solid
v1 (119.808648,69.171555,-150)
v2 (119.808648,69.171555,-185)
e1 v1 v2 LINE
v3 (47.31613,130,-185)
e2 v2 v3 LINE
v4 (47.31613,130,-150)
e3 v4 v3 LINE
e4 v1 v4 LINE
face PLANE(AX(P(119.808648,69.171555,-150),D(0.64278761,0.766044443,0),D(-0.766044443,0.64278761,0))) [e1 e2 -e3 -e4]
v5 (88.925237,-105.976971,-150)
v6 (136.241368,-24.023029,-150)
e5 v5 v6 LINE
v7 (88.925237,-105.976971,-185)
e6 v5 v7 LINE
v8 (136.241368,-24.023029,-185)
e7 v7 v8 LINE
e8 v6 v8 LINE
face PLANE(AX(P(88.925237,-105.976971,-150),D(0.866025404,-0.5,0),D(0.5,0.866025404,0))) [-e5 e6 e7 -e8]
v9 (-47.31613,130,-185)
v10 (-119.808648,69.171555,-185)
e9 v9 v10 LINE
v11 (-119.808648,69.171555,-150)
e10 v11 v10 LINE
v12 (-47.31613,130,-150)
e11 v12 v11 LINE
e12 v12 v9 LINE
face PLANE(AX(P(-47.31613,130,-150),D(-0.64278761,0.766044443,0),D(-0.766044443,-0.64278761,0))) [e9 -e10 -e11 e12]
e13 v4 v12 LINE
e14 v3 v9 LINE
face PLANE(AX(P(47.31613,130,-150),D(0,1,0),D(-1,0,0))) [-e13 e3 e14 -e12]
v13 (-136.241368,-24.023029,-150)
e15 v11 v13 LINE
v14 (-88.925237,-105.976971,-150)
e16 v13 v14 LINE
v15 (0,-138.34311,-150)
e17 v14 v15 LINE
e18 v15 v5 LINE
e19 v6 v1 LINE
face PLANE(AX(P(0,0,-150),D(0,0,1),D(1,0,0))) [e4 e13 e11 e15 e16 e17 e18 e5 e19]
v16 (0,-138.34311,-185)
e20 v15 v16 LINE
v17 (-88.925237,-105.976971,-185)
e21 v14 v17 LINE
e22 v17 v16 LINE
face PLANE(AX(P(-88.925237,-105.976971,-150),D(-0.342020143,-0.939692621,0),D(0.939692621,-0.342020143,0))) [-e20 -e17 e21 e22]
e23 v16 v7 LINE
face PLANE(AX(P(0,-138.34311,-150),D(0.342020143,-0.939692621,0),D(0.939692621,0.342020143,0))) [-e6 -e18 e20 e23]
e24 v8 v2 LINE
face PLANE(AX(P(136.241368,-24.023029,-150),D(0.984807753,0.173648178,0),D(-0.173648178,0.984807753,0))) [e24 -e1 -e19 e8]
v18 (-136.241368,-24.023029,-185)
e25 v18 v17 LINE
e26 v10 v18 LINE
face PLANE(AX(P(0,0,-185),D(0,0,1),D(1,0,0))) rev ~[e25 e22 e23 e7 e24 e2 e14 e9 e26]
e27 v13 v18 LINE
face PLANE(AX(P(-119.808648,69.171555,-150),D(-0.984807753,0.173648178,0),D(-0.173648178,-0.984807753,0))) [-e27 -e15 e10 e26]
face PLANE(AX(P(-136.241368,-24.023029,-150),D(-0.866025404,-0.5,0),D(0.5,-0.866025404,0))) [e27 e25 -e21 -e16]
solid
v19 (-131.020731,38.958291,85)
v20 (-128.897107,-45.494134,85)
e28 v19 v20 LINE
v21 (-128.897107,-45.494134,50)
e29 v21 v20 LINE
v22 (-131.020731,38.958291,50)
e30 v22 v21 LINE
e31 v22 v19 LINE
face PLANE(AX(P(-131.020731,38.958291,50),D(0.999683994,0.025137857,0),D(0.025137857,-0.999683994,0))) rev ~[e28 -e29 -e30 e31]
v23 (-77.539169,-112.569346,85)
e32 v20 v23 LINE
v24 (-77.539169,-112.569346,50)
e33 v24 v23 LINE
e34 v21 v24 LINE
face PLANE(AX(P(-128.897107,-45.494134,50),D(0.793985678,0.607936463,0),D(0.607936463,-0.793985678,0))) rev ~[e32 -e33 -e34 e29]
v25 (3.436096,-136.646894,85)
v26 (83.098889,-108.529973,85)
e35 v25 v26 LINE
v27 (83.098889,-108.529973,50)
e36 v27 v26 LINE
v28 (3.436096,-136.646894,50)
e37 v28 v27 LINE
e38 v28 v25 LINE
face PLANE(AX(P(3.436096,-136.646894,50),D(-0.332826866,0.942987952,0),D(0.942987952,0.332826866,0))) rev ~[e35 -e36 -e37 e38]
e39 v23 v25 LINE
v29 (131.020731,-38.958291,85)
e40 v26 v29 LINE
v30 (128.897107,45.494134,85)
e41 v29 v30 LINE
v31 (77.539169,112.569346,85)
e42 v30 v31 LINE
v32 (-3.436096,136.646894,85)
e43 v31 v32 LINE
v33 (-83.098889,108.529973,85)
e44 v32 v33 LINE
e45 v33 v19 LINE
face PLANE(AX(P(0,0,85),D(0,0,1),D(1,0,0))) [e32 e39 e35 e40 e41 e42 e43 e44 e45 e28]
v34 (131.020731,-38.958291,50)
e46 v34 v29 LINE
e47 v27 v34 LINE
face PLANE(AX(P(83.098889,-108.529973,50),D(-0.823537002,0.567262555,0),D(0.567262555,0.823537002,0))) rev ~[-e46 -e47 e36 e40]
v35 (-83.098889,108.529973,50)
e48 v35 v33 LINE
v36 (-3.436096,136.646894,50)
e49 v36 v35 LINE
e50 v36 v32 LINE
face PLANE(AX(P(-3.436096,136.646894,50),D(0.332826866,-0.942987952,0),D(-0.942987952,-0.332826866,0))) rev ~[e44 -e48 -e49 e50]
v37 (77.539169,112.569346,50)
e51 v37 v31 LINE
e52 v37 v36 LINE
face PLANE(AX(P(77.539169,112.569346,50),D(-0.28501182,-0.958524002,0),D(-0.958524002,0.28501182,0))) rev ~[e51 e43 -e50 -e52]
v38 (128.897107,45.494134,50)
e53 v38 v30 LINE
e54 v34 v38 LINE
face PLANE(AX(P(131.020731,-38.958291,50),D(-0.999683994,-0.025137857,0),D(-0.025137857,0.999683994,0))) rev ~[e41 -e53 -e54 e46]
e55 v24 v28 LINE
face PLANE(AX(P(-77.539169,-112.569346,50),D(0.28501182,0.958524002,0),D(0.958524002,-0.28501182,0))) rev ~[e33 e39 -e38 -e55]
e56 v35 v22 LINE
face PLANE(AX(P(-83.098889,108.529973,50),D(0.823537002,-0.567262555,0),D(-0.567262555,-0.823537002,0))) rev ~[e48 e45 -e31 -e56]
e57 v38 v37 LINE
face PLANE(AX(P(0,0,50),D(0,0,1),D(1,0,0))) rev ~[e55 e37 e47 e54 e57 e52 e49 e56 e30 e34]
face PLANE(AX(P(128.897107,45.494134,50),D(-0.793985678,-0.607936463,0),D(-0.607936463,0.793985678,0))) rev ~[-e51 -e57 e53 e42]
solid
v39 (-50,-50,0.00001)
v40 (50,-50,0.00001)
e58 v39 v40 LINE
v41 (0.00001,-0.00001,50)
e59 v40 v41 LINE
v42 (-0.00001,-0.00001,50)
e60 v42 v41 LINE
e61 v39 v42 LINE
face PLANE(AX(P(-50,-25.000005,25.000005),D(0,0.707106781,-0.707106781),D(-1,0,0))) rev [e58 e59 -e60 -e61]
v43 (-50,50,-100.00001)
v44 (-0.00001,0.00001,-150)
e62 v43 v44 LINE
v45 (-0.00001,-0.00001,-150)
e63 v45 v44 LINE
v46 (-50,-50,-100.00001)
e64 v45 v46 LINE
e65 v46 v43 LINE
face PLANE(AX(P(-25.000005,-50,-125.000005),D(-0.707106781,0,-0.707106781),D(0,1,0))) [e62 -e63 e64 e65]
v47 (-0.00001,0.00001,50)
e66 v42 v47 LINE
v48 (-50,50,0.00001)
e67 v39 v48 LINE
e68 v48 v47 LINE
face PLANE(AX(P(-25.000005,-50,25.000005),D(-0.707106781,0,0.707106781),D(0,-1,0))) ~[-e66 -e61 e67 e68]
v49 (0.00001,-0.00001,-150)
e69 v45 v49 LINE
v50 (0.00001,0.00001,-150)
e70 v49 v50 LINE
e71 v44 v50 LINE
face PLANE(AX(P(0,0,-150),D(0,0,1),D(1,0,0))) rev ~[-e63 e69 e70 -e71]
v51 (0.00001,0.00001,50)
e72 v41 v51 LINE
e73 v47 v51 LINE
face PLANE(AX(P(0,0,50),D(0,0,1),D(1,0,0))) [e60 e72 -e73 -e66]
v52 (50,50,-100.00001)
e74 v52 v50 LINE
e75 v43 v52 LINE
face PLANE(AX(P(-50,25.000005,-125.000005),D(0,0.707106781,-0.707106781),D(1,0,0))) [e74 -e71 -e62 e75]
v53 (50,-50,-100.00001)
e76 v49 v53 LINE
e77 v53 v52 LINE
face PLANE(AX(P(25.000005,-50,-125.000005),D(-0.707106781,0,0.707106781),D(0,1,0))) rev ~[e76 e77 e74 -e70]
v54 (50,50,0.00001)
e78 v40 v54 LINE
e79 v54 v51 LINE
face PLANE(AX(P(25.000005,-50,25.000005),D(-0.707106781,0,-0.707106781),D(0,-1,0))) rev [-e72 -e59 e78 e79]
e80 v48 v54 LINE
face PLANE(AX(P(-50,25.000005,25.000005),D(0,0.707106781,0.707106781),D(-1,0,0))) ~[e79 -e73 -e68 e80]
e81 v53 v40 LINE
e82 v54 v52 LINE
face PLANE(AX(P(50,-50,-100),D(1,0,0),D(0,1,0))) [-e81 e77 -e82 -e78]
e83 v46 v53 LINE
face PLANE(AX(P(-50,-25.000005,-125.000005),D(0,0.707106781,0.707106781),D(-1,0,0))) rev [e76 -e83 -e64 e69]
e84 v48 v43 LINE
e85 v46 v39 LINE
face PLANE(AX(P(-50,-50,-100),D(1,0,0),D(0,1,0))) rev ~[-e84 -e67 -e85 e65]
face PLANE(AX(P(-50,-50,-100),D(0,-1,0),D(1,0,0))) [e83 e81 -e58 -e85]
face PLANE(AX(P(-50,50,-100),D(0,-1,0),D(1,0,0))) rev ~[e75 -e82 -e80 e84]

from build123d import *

# Parameters (mm, degrees)
F0_W      = 100
F0_H      = 100
F1_DEPTH  = 100
F2_DEPTH  = 50
F3_SIZE   = 49.99999
F6_DEPTH  = 35
F7_DEPTH  = 50
F8_SIZE   = 49.99999
F11_DEPTH = 35


# Not quite as in the source:
# - a fillet or chamfer is up to 0.001 mm smaller than in the source, because OpenCascade refuses the exact size


with BuildPart() as f1:
    # F0 (on Top) → F1 (new body)
    with BuildSketch(Plane.XY):
        Rectangle(F0_W, F0_H)
    extrude(amount=-F1_DEPTH)

    # F2 (add): a face of the model
    f2_faces = [f1.faces().sort_by_distance(p)[0] for p in [
        (0, 0, 0),
    ]]
    extrude(f2_faces, amount=F2_DEPTH)

    # F3 (size 50 in the source; OpenCascade refuses exactly that, so slightly less here)
    f3_edges = [f1.edges().sort_by_distance(p)[0] for p in [
        (0, -50, 50),
        (0, 50, 50),
        (50, 0, 50),
        (-50, 0, 50),
    ]]
    chamfer(f3_edges, length=F3_SIZE)

    # F7 (add): a face of the model
    f7_faces = [f1.faces().sort_by_distance(p)[0] for p in [
        (0, 0, -100),
    ]]
    extrude(f7_faces, amount=F7_DEPTH)

    # F8 (size 50 in the source; OpenCascade refuses exactly that, so slightly less here)
    f8_edges = [f1.edges().sort_by_distance(p)[0] for p in [
        (0, -50, -150),
        (50, 0, -150),
        (-50, 0, -150),
        (0, 50, -150),
    ]]
    chamfer(f8_edges, length=F8_SIZE)


with BuildPart() as f6:
    # F5 (on offset) → F6 (new body)
    with BuildSketch(Plane.XY.offset(50)):
        Polygon((83.0988892729, -108.5299731581), (131.0207312895, -38.9582910875), (128.8971071844, 45.494134035), (77.5391691864, 112.5693462448), (-3.4360959814, 136.6468942805), (-83.0988892729, 108.5299731581), (-131.0207312895, 38.9582910875), (-128.8971071844, -45.494134035), (-77.5391691864, -112.5693462448), (3.4360959814, -136.6468942805), align=None)
    extrude(amount=F6_DEPTH)


with BuildPart() as f11:
    # F10 (on offset) → F11 (new body)
    with BuildSketch(Plane.XY.offset(-150)):
        Polygon((47.3161304546, 130), (-47.3161304546, 130), (-119.8086480639, 69.1715552109), (-136.2413677193, -24.0230290175), (-88.9252372647, -105.9769709825), (0, -138.3431104219), (88.9252372647, -105.9769709825), (136.2413677193, -24.0230290175), (119.8086480639, 69.1715552109), align=None)
    extrude(amount=-F11_DEPTH)


solid = Compound([f1.part, f6.part, f11.part])
